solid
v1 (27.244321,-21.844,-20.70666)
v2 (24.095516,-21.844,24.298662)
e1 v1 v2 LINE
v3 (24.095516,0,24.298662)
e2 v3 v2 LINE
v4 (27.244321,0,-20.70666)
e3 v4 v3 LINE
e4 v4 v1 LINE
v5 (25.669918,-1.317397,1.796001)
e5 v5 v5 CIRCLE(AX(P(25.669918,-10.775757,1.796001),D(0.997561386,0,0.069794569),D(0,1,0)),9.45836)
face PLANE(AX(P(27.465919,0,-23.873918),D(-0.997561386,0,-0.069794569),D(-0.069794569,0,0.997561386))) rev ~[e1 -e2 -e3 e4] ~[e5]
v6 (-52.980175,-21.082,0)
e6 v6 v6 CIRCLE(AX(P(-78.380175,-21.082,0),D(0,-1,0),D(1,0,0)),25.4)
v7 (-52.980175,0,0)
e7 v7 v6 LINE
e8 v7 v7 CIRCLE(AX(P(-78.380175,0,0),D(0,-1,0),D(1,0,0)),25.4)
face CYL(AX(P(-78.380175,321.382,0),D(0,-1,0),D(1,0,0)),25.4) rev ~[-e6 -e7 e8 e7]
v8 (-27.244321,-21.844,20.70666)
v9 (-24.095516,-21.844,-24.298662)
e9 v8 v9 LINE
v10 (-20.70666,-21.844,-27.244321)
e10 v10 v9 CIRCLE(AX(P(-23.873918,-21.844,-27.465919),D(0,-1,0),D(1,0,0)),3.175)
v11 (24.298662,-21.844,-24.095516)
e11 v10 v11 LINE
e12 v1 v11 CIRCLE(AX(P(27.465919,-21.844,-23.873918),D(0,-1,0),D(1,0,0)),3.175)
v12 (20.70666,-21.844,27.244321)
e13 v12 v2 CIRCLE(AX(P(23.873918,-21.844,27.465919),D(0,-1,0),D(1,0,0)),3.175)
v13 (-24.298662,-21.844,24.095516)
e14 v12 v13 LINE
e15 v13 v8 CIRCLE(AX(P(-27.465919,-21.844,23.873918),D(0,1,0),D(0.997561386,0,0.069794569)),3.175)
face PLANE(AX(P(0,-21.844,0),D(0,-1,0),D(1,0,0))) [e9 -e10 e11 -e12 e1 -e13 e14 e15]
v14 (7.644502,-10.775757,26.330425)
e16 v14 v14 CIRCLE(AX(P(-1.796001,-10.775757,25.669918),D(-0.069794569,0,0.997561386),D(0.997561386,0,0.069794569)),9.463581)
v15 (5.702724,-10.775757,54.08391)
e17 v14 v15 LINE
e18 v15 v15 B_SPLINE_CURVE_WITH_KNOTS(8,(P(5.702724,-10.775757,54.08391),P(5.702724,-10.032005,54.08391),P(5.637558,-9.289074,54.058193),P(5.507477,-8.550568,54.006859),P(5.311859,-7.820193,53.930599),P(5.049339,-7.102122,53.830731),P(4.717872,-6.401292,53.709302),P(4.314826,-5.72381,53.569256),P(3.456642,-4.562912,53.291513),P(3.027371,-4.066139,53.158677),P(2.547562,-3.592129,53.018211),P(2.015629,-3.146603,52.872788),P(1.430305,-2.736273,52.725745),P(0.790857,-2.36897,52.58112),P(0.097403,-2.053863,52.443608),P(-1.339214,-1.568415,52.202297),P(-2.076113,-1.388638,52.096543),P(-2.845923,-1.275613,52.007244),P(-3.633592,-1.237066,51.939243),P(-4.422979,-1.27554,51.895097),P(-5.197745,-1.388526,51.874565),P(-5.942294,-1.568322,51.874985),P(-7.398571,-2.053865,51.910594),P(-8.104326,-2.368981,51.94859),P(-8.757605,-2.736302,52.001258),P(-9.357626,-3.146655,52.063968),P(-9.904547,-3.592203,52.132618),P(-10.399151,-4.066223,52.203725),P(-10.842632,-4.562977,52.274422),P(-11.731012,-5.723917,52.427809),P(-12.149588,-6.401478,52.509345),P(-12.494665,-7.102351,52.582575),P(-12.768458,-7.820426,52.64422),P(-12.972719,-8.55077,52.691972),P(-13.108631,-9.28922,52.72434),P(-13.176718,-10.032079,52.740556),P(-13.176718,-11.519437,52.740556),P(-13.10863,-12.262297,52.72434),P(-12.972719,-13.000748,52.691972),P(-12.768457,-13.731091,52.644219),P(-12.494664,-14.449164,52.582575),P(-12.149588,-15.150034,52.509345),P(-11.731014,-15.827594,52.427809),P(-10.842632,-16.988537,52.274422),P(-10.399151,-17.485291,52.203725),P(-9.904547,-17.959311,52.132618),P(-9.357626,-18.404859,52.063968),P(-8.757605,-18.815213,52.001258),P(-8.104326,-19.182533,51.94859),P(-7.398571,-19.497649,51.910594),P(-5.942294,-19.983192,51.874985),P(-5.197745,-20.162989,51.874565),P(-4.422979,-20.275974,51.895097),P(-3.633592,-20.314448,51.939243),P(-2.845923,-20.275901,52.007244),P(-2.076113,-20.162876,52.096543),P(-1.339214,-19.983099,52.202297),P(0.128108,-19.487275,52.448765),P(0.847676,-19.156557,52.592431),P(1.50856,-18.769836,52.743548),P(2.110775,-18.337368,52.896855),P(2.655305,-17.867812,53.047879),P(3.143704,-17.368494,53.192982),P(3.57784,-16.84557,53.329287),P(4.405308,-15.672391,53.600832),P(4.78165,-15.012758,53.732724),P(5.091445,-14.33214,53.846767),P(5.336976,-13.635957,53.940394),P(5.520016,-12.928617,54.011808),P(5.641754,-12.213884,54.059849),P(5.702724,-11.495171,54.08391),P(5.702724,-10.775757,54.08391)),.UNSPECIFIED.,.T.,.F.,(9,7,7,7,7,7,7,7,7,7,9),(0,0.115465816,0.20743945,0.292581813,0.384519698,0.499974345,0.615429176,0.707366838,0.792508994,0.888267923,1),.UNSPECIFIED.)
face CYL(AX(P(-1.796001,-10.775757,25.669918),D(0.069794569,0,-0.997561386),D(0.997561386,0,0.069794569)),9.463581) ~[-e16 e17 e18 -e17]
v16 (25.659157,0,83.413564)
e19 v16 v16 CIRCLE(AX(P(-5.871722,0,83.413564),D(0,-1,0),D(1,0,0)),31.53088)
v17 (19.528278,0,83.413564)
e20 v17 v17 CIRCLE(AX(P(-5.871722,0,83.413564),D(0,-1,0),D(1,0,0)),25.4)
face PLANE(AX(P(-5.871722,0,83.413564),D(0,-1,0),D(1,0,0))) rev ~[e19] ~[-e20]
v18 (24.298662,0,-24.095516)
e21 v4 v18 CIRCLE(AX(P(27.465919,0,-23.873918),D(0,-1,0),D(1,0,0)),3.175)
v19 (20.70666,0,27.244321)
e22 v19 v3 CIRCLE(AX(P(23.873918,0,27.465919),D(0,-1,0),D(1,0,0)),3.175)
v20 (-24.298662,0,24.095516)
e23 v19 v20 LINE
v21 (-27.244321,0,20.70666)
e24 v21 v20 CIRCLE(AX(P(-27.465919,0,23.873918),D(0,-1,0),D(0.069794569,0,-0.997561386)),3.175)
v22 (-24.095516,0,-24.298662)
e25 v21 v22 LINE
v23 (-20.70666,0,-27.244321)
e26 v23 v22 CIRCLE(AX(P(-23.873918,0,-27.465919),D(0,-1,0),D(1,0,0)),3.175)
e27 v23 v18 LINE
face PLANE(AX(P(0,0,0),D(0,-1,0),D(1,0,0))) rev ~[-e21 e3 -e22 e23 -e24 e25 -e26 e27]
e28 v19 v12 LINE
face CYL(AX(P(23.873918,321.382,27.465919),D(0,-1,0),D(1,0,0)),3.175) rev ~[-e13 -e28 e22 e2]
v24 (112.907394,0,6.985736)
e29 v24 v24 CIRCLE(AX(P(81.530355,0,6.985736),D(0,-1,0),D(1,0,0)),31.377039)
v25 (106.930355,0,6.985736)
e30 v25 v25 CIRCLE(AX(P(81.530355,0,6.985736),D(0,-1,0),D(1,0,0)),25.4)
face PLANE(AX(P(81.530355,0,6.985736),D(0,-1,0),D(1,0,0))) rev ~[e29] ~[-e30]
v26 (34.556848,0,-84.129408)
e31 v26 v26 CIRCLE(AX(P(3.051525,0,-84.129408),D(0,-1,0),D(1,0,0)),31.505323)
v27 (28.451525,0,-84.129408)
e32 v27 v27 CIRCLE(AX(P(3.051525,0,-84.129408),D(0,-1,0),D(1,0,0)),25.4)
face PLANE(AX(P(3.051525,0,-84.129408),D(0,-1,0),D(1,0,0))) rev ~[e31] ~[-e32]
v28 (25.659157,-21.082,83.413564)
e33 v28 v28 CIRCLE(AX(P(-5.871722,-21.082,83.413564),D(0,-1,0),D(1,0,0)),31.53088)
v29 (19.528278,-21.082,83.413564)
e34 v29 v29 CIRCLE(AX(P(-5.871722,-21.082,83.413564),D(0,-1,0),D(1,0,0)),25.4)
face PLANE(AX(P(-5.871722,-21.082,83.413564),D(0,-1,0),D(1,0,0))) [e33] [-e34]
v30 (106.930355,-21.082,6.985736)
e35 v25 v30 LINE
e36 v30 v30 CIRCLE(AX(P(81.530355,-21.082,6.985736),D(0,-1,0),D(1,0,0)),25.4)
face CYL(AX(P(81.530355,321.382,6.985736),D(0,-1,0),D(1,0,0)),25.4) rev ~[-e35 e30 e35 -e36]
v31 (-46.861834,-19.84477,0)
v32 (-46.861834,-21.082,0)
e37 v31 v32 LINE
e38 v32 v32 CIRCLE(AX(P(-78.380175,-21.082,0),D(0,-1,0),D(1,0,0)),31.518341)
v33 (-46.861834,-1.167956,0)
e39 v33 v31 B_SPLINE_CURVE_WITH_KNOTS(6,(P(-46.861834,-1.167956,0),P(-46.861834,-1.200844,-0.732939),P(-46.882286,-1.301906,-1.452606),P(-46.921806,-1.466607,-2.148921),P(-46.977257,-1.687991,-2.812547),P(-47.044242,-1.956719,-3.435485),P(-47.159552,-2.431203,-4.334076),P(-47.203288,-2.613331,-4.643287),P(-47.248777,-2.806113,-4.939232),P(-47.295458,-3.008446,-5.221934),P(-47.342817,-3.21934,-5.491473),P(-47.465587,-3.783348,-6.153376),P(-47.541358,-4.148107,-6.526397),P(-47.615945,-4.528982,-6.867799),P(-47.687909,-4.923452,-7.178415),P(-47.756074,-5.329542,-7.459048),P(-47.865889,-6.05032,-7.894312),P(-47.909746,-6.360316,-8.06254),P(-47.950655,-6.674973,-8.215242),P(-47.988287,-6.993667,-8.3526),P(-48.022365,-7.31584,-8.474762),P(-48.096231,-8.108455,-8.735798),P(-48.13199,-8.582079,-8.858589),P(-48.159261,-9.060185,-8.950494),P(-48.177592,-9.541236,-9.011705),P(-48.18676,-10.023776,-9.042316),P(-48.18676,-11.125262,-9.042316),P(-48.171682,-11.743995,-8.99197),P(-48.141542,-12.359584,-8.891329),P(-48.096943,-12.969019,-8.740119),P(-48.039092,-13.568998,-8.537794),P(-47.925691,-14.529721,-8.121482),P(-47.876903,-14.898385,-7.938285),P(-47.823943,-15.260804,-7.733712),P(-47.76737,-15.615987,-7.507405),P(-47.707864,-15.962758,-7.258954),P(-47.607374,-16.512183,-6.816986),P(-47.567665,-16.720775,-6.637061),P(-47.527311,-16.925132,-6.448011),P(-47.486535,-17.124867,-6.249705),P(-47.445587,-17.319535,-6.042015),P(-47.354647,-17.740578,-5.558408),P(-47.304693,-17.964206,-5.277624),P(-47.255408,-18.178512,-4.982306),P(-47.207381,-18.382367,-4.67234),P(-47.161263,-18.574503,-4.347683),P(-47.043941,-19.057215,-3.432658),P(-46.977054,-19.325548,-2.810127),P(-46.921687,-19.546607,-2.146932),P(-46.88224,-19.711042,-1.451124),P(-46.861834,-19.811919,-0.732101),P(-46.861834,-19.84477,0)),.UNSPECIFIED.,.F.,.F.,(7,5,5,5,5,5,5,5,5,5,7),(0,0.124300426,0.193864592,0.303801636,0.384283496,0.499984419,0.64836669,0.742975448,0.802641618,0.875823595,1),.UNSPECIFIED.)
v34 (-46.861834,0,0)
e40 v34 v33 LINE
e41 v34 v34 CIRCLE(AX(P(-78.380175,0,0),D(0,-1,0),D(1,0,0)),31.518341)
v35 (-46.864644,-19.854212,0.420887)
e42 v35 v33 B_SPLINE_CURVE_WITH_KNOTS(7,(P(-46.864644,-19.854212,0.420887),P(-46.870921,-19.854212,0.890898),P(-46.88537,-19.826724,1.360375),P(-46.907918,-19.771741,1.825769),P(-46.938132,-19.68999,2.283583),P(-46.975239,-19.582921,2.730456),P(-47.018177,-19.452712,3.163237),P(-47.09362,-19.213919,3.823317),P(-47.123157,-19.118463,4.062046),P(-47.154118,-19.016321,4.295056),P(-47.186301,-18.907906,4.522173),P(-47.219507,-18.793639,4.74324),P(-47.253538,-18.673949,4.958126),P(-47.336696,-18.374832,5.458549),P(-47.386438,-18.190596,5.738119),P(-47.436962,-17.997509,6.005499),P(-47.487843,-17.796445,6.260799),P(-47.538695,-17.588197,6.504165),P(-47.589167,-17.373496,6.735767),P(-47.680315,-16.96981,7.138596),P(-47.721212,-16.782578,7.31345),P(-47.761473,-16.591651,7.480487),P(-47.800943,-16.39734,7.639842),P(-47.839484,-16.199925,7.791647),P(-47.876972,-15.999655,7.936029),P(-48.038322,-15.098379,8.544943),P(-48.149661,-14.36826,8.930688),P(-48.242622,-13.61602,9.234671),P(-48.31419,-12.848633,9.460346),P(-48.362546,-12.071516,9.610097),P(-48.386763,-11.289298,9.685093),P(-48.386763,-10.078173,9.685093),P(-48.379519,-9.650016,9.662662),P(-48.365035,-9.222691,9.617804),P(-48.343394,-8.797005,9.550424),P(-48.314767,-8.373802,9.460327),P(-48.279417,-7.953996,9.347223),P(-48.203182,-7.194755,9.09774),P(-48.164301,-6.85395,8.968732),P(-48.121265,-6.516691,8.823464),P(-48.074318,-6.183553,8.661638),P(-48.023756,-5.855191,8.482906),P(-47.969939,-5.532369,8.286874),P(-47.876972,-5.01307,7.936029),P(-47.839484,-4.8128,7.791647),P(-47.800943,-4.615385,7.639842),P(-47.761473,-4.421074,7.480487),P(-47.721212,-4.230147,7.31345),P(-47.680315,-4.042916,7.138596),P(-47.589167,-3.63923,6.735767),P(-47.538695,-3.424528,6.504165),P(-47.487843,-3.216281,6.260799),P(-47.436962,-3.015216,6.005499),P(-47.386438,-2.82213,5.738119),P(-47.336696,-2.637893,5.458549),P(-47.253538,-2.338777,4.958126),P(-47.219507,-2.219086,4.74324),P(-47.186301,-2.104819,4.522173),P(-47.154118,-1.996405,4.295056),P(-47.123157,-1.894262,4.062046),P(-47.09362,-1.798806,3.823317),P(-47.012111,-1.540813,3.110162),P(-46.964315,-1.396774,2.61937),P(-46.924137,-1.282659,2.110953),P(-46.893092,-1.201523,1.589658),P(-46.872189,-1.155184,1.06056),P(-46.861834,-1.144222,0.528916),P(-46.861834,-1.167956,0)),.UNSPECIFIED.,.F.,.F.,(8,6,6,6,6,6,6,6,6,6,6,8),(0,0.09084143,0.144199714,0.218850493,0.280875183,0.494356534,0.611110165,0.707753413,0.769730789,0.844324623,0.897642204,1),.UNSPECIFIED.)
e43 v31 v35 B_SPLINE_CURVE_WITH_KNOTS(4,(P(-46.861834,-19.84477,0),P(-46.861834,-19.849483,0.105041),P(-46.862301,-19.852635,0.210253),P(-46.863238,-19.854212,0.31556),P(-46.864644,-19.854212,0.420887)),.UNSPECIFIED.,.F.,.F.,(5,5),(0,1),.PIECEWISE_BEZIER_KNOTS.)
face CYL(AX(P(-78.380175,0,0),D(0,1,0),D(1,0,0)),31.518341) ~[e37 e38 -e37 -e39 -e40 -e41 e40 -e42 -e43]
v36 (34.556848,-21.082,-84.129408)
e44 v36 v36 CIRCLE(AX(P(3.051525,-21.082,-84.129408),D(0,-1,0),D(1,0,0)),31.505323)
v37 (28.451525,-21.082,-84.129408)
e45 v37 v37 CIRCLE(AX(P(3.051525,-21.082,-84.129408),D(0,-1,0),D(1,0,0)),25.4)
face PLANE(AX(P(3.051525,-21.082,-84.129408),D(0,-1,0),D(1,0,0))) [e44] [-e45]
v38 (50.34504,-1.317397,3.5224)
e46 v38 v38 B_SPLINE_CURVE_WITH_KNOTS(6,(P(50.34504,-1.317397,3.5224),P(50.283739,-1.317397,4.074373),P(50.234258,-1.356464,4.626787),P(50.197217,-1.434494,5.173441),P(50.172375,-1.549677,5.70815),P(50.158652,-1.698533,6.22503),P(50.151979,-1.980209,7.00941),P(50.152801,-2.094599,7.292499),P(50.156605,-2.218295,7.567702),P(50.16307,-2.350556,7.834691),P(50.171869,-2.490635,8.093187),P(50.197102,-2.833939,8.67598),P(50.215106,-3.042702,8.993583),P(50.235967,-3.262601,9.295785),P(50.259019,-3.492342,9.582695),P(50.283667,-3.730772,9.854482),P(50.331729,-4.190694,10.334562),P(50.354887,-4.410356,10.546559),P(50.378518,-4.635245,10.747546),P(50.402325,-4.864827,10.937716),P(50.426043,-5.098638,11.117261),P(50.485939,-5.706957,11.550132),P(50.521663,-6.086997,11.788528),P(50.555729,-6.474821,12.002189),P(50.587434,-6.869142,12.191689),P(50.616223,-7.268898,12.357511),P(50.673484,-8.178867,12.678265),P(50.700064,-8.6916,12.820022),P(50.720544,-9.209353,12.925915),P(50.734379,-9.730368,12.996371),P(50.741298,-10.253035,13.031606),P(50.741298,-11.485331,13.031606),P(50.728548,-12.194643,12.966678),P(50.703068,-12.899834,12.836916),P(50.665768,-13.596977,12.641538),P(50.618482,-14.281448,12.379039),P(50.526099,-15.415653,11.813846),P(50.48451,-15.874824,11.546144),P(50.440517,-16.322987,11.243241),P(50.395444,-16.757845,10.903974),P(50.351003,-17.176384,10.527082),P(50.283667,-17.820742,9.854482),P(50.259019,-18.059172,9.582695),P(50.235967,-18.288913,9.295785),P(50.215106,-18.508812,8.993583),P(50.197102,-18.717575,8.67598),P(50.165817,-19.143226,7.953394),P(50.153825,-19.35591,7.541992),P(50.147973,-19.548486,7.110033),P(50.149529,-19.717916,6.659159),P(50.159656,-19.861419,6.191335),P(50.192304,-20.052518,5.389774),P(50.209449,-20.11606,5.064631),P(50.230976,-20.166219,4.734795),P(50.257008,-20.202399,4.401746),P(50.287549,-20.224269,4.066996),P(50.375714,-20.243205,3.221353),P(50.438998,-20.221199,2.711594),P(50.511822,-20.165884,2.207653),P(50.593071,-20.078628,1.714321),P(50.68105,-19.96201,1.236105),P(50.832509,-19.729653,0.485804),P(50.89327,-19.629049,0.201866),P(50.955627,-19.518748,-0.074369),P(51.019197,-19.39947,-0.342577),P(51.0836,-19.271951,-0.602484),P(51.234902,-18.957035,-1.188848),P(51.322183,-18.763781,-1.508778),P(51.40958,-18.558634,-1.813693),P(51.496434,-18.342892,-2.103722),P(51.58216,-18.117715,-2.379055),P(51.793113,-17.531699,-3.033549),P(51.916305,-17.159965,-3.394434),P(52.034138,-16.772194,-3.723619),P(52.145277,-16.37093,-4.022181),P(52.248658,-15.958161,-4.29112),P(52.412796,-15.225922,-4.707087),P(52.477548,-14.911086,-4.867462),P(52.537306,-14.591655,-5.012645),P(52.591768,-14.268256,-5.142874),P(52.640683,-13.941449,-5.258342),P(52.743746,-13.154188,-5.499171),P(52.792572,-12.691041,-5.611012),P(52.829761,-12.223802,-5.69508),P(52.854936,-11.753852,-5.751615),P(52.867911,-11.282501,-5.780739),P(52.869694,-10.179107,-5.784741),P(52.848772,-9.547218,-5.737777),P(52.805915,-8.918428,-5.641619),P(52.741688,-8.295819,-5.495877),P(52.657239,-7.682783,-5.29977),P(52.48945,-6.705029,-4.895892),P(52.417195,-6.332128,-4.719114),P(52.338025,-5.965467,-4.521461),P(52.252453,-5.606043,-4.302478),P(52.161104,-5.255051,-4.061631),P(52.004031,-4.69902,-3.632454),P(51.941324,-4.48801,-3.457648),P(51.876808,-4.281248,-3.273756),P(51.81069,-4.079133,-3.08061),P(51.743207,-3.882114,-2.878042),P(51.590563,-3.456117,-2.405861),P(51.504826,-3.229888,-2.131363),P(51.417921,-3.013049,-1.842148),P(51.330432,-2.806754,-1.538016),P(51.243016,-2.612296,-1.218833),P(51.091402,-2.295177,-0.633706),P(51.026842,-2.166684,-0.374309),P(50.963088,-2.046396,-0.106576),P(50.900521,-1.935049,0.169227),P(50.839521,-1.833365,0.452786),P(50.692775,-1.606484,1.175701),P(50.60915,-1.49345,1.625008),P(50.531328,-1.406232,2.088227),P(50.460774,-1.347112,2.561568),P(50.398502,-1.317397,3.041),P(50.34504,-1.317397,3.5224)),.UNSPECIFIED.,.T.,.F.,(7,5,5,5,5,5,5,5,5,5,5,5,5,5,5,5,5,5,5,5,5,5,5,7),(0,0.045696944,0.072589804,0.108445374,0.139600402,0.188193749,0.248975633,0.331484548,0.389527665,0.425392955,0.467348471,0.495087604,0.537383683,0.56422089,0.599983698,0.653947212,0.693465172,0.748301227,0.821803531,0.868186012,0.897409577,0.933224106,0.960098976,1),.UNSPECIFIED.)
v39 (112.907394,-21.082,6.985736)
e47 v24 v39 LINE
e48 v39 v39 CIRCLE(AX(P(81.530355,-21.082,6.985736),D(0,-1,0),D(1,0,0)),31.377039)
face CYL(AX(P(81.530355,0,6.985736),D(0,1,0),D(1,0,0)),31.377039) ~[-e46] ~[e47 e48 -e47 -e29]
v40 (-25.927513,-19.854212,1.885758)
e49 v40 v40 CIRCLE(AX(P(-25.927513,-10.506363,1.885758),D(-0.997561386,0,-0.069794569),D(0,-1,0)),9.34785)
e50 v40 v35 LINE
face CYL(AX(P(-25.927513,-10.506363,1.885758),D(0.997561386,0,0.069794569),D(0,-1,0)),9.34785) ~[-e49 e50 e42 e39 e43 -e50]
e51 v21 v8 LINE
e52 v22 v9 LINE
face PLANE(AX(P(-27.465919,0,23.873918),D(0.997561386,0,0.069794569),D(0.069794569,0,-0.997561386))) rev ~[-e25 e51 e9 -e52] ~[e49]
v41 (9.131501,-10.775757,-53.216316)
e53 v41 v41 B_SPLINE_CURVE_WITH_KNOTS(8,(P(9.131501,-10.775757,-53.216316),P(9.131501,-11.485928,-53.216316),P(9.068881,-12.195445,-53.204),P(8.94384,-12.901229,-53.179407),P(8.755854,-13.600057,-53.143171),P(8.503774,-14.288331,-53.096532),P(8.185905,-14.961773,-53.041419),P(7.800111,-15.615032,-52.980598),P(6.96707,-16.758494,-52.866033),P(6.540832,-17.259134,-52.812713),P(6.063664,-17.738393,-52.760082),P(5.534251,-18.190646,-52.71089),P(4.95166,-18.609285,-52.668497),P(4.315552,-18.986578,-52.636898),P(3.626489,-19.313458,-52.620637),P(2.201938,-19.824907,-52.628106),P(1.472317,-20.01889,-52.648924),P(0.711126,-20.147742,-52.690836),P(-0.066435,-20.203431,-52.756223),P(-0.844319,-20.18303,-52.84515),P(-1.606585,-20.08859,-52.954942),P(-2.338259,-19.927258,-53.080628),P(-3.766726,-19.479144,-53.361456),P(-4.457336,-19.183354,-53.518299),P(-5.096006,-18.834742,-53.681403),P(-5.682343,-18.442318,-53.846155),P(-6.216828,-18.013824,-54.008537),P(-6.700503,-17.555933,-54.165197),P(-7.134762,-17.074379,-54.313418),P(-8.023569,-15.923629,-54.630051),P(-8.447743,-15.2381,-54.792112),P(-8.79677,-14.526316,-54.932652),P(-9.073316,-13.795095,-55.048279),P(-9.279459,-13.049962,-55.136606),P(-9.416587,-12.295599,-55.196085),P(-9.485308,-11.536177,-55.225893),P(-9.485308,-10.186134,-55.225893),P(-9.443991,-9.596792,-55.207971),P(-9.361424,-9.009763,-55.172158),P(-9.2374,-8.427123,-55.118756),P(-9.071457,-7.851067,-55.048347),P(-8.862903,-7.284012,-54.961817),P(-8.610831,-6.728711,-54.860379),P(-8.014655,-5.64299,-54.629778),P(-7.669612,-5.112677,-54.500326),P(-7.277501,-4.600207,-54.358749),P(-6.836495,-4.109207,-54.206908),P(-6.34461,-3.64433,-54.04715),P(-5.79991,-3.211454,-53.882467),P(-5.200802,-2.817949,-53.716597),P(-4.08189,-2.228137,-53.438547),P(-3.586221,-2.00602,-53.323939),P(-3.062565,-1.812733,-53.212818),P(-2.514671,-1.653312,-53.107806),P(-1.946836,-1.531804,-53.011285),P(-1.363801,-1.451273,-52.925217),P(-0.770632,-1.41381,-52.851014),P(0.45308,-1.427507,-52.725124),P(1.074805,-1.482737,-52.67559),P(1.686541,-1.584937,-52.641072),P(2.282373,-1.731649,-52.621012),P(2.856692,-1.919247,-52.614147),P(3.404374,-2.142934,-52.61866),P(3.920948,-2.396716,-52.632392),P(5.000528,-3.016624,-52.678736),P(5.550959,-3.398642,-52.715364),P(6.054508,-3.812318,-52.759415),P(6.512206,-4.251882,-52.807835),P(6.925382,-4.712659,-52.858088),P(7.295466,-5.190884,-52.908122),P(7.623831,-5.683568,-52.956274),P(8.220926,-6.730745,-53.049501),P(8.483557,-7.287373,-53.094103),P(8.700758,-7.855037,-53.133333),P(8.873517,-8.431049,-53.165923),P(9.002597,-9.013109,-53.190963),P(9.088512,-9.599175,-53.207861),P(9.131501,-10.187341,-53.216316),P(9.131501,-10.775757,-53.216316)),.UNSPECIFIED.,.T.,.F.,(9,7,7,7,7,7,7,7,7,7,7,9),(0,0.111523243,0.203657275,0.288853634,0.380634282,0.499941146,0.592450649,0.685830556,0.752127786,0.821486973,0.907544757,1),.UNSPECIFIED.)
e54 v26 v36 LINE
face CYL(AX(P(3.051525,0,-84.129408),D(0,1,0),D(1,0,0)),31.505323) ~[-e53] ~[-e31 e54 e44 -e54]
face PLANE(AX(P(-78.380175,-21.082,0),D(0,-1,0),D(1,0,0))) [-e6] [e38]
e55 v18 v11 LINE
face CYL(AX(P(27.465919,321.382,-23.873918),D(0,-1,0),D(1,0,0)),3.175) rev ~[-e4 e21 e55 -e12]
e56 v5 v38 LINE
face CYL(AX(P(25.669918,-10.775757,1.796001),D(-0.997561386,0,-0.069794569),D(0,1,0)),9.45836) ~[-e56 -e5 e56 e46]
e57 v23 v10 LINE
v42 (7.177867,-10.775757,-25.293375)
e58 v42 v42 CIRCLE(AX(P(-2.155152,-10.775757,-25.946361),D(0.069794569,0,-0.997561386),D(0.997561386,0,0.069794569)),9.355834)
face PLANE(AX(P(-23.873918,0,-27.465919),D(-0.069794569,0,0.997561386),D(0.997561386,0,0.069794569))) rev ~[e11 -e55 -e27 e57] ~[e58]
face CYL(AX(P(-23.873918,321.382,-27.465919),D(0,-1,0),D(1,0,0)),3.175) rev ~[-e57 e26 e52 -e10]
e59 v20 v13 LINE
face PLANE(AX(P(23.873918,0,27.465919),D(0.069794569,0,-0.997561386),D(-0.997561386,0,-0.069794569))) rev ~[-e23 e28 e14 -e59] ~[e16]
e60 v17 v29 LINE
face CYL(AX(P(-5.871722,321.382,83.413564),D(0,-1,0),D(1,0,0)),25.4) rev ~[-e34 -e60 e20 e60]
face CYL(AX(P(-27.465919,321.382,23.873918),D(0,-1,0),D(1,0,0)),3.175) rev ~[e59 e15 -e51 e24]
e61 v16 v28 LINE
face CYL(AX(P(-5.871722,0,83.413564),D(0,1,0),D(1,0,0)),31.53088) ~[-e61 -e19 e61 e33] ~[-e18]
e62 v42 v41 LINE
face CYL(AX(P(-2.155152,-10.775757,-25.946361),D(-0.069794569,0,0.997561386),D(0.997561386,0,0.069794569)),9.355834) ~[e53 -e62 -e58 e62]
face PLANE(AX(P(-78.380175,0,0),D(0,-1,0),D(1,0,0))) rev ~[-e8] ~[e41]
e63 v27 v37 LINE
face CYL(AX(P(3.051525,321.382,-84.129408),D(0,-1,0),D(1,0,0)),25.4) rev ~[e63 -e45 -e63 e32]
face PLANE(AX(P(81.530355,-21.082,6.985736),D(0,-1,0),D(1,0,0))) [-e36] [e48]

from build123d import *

# Parameters (mm, degrees)
F1_DEPTH  = 21.844
F5_R      = 9.3558336569
F6_DEPTH  = 58.42
F3_R      = 9.4583600755
F7_DEPTH  = 55.626
F4_R      = 9.3478497533
F8_DEPTH  = 52.832
F2_R      = 9.4635805484
F9_DEPTH  = 58.42
F12_R     = 31.3770390823
F10_R     = 31.5053231156
F11_R     = 31.5183409025
F13_R     = 31.5308798418
F14_DEPTH = 21.082
F21_D     = 6.35
F23_D     = 50.8
F25_D     = 50.8
F27_D     = 50.8
F29_D     = 50.8


# Not quite as in the source:
# - the program builds the solid bodies; features that only make, move or delete a surface that nothing else refers to are left out


with BuildPart() as f1:
    # F0 (on Front) → F1 (new body)
    with BuildSketch(Plane.XZ):
        Polygon((23.8739177585, 27.4659190327), (-27.4659190327, 23.8739177585), (-23.8739177585, -27.4659190327), (27.4659190327, -23.8739177585), align=None)
    extrude(amount=F1_DEPTH)

    # F5 (on face) → F6 (join)
    with BuildSketch(Plane(origin=(1.7960006371, 0, -25.6699183956), x_dir=(0.9975613857, 0, 0.0697945687), z_dir=(0.0697945687, 0, -0.9975613857))):
        with Locations((-3.9608110674, 10.7757570222)):
            Circle(F5_R)
    extrude(amount=F6_DEPTH)

    # F3 (on face) → F7 (join)
    with BuildSketch(Plane(origin=(25.6699183956, 0, 1.7960006371), x_dir=(0, 1, 0), z_dir=(0.9975613857, 0, 0.0697945687))):
        with Locations((-10.7757570222, 0)):
            Circle(F3_R)
    extrude(amount=F7_DEPTH)

    # F4 (on face) → F8 (join)
    with BuildSketch(Plane(origin=(-25.6699183956, 0, -1.7960006371), x_dir=(0, -1, 0), z_dir=(-0.9975613857, 0, -0.0697945687))):
        with Locations((10.5063626543, 3.6907584872)):
            Circle(F4_R)
    extrude(amount=F8_DEPTH)

    # F2 (on face) → F9 (join)
    with BuildSketch(Plane(origin=(-1.7960006371, 0, 25.6699183956), x_dir=(0.9975613857, 0, 0.0697945687), z_dir=(-0.0697945687, 0, 0.9975613857))):
        with Locations((0, -10.7757570222)):
            Circle(F2_R)
    extrude(amount=F9_DEPTH)

    # F12 (on Front) + F10 (on Front) + F11 (on Front) + F13 (on Front) → F14 (join)
    with BuildSketch(Plane.XZ):
        with Locations((81.530354917, 6.9857356139)):
            Circle(F12_R)
    with BuildSketch(Plane.XZ):
        with Locations((3.051524749, -84.1294080019)):
            Circle(F10_R)
    with BuildSketch(Plane.XZ):
        with Locations((-78.3801749349, 0)):
            Circle(F11_R)
    with BuildSketch(Plane.XZ):
        with Locations((-5.8717224747, 83.4135636687)):
            Circle(F13_R)
    extrude(amount=F14_DEPTH)

    # F21 (through all)
    with Locations(Plane(origin=(0, 0, 0), x_dir=(-1, 0, 0), z_dir=(0, 1, 0))):
        with Locations((23.8739177585, -27.4659190327), (-27.4659190327, -23.8739177585), (-23.8739177585, 27.4659190327), (27.4659190327, 23.8739177585)):
            Hole(F21_D / 2)

    # F23 (through all)
    with Locations(Plane(origin=(0, 0, 0), x_dir=(-1, 0, 0), z_dir=(0, 1, 0))):
        with Locations((5.8717224747, 83.4135636687)):
            Hole(F23_D / 2)

    # F25 (through all)
    with Locations(Plane(origin=(0, 0, 0), x_dir=(-1, 0, 0), z_dir=(0, 1, 0))):
        with Locations((-81.530354917, 6.9857356139)):
            Hole(F25_D / 2)

    # F27 (through all)
    with Locations(Plane(origin=(0, 0, 0), x_dir=(-1, 0, 0), z_dir=(0, 1, 0))):
        with Locations((78.3801749349, 0)):
            Hole(F27_D / 2)

    # F29 (through all)
    with Locations(Plane(origin=(0, 0, 0), x_dir=(-1, 0, 0), z_dir=(0, 1, 0))):
        with Locations((-3.051524749, -84.1294080019)):
            Hole(F29_D / 2)


solid = f1.part
